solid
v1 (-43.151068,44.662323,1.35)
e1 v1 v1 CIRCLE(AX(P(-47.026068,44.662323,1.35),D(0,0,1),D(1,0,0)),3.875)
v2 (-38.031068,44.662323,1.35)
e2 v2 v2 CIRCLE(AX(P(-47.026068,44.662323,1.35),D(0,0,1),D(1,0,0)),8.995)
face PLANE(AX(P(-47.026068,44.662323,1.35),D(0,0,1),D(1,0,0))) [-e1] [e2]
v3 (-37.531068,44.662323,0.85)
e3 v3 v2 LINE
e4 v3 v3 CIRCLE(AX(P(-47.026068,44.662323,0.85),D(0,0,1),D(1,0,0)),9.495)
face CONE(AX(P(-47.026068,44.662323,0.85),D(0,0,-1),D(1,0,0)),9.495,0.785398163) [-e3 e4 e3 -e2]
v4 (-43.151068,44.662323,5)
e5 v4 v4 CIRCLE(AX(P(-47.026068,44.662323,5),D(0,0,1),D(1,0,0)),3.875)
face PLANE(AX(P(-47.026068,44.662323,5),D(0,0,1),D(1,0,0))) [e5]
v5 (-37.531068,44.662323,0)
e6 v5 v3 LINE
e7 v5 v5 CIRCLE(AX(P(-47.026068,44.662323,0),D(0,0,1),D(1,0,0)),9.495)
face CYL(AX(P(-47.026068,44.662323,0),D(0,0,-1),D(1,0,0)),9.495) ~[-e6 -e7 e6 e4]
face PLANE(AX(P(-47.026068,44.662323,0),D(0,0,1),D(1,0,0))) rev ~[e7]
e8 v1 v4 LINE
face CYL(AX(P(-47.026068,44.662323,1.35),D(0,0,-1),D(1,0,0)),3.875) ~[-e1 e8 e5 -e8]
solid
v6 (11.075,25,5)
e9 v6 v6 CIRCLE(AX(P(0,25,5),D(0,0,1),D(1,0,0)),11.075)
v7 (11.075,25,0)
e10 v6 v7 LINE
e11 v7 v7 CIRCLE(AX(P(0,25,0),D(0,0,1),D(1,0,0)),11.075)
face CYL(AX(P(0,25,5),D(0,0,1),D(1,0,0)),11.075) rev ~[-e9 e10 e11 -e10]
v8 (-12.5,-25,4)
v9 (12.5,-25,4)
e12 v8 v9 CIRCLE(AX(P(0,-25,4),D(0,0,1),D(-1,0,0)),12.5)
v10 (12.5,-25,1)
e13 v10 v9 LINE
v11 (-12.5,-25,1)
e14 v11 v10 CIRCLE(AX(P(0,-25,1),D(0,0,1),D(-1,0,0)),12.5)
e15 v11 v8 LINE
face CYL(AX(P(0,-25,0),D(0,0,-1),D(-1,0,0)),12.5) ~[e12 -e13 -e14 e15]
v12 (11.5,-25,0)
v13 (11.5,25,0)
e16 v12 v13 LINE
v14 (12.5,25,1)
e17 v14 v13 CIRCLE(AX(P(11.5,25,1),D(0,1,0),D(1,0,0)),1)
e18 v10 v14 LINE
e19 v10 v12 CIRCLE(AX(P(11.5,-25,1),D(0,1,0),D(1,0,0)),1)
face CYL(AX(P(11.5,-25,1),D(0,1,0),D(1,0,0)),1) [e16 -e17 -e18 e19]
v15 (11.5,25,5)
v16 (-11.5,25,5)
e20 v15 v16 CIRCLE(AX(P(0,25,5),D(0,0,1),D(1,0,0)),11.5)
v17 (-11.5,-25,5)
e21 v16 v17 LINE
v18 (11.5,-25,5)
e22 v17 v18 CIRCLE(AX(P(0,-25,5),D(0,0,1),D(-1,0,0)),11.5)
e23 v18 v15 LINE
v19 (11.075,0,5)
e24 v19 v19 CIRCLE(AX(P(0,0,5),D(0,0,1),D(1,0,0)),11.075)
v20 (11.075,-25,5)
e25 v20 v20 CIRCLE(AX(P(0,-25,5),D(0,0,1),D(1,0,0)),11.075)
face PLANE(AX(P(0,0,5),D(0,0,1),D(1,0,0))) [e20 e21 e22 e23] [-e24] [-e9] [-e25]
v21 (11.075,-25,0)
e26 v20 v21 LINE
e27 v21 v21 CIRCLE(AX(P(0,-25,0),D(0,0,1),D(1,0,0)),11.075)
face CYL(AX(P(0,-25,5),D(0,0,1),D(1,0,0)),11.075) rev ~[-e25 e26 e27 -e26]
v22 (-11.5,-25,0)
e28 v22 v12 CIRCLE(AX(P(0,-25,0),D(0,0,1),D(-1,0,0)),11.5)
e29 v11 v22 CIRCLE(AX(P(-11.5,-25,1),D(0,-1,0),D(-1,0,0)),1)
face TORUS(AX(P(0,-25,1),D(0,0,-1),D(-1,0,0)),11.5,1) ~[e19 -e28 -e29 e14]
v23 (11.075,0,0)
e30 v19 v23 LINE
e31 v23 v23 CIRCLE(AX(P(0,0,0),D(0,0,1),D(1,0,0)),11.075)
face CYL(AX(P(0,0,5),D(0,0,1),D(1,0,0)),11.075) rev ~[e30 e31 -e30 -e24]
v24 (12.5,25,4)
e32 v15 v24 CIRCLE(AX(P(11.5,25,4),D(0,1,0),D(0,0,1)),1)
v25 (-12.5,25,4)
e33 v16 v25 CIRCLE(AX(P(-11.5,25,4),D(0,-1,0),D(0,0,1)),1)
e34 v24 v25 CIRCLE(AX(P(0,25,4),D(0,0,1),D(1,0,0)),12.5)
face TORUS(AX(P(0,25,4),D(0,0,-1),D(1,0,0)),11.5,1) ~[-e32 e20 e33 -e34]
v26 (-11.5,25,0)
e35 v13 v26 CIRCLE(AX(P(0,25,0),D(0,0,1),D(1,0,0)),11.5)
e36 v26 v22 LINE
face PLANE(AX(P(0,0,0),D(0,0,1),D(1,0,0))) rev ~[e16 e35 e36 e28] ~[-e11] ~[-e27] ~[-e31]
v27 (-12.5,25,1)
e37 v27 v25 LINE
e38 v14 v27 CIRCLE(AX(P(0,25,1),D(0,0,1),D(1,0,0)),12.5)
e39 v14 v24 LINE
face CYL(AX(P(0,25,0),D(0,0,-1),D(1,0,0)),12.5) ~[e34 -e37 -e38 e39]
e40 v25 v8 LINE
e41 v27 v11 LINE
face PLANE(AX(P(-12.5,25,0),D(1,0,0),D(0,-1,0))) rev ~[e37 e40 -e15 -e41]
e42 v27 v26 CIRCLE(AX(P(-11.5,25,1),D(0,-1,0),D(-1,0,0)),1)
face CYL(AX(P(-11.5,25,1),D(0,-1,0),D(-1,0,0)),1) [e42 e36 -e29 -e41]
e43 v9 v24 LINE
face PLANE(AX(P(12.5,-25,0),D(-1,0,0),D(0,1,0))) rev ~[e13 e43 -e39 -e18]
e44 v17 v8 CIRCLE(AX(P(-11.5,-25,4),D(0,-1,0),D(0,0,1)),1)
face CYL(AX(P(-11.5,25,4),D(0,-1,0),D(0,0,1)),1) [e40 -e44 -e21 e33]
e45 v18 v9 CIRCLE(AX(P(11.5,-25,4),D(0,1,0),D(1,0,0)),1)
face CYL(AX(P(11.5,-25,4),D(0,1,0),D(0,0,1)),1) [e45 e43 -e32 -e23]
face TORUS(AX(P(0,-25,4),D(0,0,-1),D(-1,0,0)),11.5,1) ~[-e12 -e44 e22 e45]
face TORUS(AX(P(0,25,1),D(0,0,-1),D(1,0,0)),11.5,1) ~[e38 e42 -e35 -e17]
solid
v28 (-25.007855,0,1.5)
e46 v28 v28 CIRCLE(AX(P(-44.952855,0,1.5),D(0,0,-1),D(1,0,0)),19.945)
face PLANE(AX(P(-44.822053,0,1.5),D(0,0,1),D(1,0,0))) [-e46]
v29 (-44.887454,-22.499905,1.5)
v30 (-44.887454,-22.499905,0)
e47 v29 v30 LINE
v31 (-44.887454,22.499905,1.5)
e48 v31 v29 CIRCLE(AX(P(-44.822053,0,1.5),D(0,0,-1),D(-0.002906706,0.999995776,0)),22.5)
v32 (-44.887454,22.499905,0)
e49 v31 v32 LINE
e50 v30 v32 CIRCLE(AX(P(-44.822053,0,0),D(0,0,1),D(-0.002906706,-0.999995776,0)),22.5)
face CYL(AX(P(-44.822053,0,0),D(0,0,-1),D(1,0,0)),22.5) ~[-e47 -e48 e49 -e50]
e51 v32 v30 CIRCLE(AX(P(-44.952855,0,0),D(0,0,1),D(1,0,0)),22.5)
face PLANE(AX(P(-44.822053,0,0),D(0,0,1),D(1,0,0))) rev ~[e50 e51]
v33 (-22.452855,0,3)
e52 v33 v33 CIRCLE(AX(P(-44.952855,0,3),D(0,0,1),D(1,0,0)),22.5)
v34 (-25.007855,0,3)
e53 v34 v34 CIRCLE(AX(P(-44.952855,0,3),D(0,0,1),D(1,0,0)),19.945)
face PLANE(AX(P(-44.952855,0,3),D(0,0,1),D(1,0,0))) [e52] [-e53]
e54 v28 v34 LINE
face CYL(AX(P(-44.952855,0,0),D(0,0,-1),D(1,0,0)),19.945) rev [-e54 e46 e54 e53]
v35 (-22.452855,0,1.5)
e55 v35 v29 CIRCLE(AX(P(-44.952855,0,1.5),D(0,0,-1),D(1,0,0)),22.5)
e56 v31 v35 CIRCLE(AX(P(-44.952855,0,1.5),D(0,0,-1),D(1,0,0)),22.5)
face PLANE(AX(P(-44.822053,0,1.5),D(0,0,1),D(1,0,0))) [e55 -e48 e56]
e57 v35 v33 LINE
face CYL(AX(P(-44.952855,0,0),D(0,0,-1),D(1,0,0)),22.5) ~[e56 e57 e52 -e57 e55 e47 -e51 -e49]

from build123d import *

# Parameters (mm, degrees)
F1_DEPTH  = 5
F2_R      = 11.075
F3_DEPTH  = 25
F4_R      = 22.5
F4_R_2    = 19.945
F5_DEPTH  = 3
F6_R      = 22.5
F7_DEPTH  = 1.5
F8_R      = 9.495
F9_DEPTH  = 1.35
F10_SIZE  = 0.5
F11_R     = 3.875
F12_DEPTH = 3.65
F13_R     = 1


# Not quite as in the source:
# - a feature names something its author has since deleted; it is built from what else it names


with BuildPart() as f1:
    # F0 (on Top) → F1 (new body)
    with BuildSketch(Plane.XY):
        with BuildLine():
            ThreePointArc((0, -12.5), (8.8388347648, -8.8388347648), (12.5, 0))
            ThreePointArc((12.5, 0), (8.8388347677, 8.838834762), (8.1e-09, 12.5))
            ThreePointArc((8.1e-09, 12.5), (-8.838834762, 8.8388347677), (-12.5, 0))
            ThreePointArc((-12.5, 0), (-8.8388347648, -8.8388347648), (0, -12.5))
        make_face()
        with BuildLine():
            Line((12.5, -25), (12.5, 0))
            ThreePointArc((12.5, 0), (8.8388347648, -8.8388347648), (0, -12.5))
            ThreePointArc((0, -12.5), (8.8388347648, -16.1611652352), (12.5, -25))
        make_face()
        with BuildLine():
            ThreePointArc((8.1e-09, 12.5), (8.8388347677, 8.838834762), (12.5, 0))
            Line((12.5, 0), (12.5, 25))
            ThreePointArc((12.5, 25), (8.8388347677, 16.161165238), (8.1e-09, 12.5))
        make_face()
        with BuildLine():
            ThreePointArc((-12.5, 0), (-8.838834762, 8.8388347677), (8.1e-09, 12.5))
            ThreePointArc((8.1e-09, 12.5), (-8.838834762, 16.1611652323), (-12.5, 25))
            Line((-12.5, 25), (-12.5, 0))
        make_face()
        with BuildLine():
            ThreePointArc((-12.5, 25), (-8.838834762, 16.1611652323), (8.1e-09, 12.5))
            ThreePointArc((8.1e-09, 12.5), (8.8388347677, 16.161165238), (12.5, 25))
            ThreePointArc((12.5, 25), (0, 37.5), (-12.5, 25))
        make_face()
        with BuildLine():
            ThreePointArc((-12.5, -25), (-8.8388347648, -16.1611652352), (0, -12.5))
            ThreePointArc((0, -12.5), (-8.8388347648, -8.8388347648), (-12.5, 0))
            Line((-12.5, 0), (-12.5, -25))
        make_face()
        with BuildLine():
            ThreePointArc((12.5, -25), (8.8388347648, -16.1611652352), (0, -12.5))
            ThreePointArc((0, -12.5), (-8.8388347648, -16.1611652352), (-12.5, -25))
            ThreePointArc((-12.5, -25), (0, -37.5), (12.5, -25))
        make_face()
    extrude(amount=F1_DEPTH)

    # F2 (on face) → F3 (cut)
    with BuildSketch(Plane.XY.offset(5)):
        with Locations((0, 25)):
            Circle(F2_R)
        Circle(F2_R)
        with Locations((0, -25)):
            Circle(F2_R)
    extrude(amount=-F3_DEPTH, mode=Mode.SUBTRACT)

    # F13
    f13_edges = [f1.edges().sort_by_distance(p)[0] for p in [
        (-12.5, 0, 5),
        (0, 37.5, 5),
        (0, -37.5, 5),
        (0, -37.5, 0),
        (12.5, 0, 0),
        (0, 37.5, 0),
        (-12.5, 0, 0),
    ]]
    fillet(f13_edges, radius=F13_R)


with BuildPart() as f5:
    # F4 (on Top) → F5 (new body)
    with BuildSketch(Plane.XY):
        with Locations((-44.9528545141, 0)):
            Circle(F4_R)
        with Locations((-44.9528545141, 0)):
            Circle(F4_R_2, mode=Mode.SUBTRACT)
    extrude(amount=F5_DEPTH)

    # F6 (on face) → F7 (join)
    with BuildSketch(Plane.XY):
        with Locations((-44.8220527387, 0)):
            Circle(F6_R)
    extrude(amount=F7_DEPTH)


with BuildPart() as f9:
    # F8 (on Top) → F9 (new body)
    with BuildSketch(Plane.XY):
        with Locations((-47.0260679722, 44.662322849)):
            Circle(F8_R)
    extrude(amount=F9_DEPTH)

    # F10
    f10_edges = [f9.edges().sort_by_distance(p)[0] for p in [
        (-56.521068, 44.662323, 1.35),
    ]]
    chamfer(f10_edges, length=F10_SIZE)

    # F11 (on face) → F12 (join)
    with BuildSketch(Plane.XY.offset(1.35)):
        with Locations((-47.0260679722, 44.662322849)):
            Circle(F11_R)
    extrude(amount=F12_DEPTH)


solid = Compound([f1.part, f5.part, f9.part])
